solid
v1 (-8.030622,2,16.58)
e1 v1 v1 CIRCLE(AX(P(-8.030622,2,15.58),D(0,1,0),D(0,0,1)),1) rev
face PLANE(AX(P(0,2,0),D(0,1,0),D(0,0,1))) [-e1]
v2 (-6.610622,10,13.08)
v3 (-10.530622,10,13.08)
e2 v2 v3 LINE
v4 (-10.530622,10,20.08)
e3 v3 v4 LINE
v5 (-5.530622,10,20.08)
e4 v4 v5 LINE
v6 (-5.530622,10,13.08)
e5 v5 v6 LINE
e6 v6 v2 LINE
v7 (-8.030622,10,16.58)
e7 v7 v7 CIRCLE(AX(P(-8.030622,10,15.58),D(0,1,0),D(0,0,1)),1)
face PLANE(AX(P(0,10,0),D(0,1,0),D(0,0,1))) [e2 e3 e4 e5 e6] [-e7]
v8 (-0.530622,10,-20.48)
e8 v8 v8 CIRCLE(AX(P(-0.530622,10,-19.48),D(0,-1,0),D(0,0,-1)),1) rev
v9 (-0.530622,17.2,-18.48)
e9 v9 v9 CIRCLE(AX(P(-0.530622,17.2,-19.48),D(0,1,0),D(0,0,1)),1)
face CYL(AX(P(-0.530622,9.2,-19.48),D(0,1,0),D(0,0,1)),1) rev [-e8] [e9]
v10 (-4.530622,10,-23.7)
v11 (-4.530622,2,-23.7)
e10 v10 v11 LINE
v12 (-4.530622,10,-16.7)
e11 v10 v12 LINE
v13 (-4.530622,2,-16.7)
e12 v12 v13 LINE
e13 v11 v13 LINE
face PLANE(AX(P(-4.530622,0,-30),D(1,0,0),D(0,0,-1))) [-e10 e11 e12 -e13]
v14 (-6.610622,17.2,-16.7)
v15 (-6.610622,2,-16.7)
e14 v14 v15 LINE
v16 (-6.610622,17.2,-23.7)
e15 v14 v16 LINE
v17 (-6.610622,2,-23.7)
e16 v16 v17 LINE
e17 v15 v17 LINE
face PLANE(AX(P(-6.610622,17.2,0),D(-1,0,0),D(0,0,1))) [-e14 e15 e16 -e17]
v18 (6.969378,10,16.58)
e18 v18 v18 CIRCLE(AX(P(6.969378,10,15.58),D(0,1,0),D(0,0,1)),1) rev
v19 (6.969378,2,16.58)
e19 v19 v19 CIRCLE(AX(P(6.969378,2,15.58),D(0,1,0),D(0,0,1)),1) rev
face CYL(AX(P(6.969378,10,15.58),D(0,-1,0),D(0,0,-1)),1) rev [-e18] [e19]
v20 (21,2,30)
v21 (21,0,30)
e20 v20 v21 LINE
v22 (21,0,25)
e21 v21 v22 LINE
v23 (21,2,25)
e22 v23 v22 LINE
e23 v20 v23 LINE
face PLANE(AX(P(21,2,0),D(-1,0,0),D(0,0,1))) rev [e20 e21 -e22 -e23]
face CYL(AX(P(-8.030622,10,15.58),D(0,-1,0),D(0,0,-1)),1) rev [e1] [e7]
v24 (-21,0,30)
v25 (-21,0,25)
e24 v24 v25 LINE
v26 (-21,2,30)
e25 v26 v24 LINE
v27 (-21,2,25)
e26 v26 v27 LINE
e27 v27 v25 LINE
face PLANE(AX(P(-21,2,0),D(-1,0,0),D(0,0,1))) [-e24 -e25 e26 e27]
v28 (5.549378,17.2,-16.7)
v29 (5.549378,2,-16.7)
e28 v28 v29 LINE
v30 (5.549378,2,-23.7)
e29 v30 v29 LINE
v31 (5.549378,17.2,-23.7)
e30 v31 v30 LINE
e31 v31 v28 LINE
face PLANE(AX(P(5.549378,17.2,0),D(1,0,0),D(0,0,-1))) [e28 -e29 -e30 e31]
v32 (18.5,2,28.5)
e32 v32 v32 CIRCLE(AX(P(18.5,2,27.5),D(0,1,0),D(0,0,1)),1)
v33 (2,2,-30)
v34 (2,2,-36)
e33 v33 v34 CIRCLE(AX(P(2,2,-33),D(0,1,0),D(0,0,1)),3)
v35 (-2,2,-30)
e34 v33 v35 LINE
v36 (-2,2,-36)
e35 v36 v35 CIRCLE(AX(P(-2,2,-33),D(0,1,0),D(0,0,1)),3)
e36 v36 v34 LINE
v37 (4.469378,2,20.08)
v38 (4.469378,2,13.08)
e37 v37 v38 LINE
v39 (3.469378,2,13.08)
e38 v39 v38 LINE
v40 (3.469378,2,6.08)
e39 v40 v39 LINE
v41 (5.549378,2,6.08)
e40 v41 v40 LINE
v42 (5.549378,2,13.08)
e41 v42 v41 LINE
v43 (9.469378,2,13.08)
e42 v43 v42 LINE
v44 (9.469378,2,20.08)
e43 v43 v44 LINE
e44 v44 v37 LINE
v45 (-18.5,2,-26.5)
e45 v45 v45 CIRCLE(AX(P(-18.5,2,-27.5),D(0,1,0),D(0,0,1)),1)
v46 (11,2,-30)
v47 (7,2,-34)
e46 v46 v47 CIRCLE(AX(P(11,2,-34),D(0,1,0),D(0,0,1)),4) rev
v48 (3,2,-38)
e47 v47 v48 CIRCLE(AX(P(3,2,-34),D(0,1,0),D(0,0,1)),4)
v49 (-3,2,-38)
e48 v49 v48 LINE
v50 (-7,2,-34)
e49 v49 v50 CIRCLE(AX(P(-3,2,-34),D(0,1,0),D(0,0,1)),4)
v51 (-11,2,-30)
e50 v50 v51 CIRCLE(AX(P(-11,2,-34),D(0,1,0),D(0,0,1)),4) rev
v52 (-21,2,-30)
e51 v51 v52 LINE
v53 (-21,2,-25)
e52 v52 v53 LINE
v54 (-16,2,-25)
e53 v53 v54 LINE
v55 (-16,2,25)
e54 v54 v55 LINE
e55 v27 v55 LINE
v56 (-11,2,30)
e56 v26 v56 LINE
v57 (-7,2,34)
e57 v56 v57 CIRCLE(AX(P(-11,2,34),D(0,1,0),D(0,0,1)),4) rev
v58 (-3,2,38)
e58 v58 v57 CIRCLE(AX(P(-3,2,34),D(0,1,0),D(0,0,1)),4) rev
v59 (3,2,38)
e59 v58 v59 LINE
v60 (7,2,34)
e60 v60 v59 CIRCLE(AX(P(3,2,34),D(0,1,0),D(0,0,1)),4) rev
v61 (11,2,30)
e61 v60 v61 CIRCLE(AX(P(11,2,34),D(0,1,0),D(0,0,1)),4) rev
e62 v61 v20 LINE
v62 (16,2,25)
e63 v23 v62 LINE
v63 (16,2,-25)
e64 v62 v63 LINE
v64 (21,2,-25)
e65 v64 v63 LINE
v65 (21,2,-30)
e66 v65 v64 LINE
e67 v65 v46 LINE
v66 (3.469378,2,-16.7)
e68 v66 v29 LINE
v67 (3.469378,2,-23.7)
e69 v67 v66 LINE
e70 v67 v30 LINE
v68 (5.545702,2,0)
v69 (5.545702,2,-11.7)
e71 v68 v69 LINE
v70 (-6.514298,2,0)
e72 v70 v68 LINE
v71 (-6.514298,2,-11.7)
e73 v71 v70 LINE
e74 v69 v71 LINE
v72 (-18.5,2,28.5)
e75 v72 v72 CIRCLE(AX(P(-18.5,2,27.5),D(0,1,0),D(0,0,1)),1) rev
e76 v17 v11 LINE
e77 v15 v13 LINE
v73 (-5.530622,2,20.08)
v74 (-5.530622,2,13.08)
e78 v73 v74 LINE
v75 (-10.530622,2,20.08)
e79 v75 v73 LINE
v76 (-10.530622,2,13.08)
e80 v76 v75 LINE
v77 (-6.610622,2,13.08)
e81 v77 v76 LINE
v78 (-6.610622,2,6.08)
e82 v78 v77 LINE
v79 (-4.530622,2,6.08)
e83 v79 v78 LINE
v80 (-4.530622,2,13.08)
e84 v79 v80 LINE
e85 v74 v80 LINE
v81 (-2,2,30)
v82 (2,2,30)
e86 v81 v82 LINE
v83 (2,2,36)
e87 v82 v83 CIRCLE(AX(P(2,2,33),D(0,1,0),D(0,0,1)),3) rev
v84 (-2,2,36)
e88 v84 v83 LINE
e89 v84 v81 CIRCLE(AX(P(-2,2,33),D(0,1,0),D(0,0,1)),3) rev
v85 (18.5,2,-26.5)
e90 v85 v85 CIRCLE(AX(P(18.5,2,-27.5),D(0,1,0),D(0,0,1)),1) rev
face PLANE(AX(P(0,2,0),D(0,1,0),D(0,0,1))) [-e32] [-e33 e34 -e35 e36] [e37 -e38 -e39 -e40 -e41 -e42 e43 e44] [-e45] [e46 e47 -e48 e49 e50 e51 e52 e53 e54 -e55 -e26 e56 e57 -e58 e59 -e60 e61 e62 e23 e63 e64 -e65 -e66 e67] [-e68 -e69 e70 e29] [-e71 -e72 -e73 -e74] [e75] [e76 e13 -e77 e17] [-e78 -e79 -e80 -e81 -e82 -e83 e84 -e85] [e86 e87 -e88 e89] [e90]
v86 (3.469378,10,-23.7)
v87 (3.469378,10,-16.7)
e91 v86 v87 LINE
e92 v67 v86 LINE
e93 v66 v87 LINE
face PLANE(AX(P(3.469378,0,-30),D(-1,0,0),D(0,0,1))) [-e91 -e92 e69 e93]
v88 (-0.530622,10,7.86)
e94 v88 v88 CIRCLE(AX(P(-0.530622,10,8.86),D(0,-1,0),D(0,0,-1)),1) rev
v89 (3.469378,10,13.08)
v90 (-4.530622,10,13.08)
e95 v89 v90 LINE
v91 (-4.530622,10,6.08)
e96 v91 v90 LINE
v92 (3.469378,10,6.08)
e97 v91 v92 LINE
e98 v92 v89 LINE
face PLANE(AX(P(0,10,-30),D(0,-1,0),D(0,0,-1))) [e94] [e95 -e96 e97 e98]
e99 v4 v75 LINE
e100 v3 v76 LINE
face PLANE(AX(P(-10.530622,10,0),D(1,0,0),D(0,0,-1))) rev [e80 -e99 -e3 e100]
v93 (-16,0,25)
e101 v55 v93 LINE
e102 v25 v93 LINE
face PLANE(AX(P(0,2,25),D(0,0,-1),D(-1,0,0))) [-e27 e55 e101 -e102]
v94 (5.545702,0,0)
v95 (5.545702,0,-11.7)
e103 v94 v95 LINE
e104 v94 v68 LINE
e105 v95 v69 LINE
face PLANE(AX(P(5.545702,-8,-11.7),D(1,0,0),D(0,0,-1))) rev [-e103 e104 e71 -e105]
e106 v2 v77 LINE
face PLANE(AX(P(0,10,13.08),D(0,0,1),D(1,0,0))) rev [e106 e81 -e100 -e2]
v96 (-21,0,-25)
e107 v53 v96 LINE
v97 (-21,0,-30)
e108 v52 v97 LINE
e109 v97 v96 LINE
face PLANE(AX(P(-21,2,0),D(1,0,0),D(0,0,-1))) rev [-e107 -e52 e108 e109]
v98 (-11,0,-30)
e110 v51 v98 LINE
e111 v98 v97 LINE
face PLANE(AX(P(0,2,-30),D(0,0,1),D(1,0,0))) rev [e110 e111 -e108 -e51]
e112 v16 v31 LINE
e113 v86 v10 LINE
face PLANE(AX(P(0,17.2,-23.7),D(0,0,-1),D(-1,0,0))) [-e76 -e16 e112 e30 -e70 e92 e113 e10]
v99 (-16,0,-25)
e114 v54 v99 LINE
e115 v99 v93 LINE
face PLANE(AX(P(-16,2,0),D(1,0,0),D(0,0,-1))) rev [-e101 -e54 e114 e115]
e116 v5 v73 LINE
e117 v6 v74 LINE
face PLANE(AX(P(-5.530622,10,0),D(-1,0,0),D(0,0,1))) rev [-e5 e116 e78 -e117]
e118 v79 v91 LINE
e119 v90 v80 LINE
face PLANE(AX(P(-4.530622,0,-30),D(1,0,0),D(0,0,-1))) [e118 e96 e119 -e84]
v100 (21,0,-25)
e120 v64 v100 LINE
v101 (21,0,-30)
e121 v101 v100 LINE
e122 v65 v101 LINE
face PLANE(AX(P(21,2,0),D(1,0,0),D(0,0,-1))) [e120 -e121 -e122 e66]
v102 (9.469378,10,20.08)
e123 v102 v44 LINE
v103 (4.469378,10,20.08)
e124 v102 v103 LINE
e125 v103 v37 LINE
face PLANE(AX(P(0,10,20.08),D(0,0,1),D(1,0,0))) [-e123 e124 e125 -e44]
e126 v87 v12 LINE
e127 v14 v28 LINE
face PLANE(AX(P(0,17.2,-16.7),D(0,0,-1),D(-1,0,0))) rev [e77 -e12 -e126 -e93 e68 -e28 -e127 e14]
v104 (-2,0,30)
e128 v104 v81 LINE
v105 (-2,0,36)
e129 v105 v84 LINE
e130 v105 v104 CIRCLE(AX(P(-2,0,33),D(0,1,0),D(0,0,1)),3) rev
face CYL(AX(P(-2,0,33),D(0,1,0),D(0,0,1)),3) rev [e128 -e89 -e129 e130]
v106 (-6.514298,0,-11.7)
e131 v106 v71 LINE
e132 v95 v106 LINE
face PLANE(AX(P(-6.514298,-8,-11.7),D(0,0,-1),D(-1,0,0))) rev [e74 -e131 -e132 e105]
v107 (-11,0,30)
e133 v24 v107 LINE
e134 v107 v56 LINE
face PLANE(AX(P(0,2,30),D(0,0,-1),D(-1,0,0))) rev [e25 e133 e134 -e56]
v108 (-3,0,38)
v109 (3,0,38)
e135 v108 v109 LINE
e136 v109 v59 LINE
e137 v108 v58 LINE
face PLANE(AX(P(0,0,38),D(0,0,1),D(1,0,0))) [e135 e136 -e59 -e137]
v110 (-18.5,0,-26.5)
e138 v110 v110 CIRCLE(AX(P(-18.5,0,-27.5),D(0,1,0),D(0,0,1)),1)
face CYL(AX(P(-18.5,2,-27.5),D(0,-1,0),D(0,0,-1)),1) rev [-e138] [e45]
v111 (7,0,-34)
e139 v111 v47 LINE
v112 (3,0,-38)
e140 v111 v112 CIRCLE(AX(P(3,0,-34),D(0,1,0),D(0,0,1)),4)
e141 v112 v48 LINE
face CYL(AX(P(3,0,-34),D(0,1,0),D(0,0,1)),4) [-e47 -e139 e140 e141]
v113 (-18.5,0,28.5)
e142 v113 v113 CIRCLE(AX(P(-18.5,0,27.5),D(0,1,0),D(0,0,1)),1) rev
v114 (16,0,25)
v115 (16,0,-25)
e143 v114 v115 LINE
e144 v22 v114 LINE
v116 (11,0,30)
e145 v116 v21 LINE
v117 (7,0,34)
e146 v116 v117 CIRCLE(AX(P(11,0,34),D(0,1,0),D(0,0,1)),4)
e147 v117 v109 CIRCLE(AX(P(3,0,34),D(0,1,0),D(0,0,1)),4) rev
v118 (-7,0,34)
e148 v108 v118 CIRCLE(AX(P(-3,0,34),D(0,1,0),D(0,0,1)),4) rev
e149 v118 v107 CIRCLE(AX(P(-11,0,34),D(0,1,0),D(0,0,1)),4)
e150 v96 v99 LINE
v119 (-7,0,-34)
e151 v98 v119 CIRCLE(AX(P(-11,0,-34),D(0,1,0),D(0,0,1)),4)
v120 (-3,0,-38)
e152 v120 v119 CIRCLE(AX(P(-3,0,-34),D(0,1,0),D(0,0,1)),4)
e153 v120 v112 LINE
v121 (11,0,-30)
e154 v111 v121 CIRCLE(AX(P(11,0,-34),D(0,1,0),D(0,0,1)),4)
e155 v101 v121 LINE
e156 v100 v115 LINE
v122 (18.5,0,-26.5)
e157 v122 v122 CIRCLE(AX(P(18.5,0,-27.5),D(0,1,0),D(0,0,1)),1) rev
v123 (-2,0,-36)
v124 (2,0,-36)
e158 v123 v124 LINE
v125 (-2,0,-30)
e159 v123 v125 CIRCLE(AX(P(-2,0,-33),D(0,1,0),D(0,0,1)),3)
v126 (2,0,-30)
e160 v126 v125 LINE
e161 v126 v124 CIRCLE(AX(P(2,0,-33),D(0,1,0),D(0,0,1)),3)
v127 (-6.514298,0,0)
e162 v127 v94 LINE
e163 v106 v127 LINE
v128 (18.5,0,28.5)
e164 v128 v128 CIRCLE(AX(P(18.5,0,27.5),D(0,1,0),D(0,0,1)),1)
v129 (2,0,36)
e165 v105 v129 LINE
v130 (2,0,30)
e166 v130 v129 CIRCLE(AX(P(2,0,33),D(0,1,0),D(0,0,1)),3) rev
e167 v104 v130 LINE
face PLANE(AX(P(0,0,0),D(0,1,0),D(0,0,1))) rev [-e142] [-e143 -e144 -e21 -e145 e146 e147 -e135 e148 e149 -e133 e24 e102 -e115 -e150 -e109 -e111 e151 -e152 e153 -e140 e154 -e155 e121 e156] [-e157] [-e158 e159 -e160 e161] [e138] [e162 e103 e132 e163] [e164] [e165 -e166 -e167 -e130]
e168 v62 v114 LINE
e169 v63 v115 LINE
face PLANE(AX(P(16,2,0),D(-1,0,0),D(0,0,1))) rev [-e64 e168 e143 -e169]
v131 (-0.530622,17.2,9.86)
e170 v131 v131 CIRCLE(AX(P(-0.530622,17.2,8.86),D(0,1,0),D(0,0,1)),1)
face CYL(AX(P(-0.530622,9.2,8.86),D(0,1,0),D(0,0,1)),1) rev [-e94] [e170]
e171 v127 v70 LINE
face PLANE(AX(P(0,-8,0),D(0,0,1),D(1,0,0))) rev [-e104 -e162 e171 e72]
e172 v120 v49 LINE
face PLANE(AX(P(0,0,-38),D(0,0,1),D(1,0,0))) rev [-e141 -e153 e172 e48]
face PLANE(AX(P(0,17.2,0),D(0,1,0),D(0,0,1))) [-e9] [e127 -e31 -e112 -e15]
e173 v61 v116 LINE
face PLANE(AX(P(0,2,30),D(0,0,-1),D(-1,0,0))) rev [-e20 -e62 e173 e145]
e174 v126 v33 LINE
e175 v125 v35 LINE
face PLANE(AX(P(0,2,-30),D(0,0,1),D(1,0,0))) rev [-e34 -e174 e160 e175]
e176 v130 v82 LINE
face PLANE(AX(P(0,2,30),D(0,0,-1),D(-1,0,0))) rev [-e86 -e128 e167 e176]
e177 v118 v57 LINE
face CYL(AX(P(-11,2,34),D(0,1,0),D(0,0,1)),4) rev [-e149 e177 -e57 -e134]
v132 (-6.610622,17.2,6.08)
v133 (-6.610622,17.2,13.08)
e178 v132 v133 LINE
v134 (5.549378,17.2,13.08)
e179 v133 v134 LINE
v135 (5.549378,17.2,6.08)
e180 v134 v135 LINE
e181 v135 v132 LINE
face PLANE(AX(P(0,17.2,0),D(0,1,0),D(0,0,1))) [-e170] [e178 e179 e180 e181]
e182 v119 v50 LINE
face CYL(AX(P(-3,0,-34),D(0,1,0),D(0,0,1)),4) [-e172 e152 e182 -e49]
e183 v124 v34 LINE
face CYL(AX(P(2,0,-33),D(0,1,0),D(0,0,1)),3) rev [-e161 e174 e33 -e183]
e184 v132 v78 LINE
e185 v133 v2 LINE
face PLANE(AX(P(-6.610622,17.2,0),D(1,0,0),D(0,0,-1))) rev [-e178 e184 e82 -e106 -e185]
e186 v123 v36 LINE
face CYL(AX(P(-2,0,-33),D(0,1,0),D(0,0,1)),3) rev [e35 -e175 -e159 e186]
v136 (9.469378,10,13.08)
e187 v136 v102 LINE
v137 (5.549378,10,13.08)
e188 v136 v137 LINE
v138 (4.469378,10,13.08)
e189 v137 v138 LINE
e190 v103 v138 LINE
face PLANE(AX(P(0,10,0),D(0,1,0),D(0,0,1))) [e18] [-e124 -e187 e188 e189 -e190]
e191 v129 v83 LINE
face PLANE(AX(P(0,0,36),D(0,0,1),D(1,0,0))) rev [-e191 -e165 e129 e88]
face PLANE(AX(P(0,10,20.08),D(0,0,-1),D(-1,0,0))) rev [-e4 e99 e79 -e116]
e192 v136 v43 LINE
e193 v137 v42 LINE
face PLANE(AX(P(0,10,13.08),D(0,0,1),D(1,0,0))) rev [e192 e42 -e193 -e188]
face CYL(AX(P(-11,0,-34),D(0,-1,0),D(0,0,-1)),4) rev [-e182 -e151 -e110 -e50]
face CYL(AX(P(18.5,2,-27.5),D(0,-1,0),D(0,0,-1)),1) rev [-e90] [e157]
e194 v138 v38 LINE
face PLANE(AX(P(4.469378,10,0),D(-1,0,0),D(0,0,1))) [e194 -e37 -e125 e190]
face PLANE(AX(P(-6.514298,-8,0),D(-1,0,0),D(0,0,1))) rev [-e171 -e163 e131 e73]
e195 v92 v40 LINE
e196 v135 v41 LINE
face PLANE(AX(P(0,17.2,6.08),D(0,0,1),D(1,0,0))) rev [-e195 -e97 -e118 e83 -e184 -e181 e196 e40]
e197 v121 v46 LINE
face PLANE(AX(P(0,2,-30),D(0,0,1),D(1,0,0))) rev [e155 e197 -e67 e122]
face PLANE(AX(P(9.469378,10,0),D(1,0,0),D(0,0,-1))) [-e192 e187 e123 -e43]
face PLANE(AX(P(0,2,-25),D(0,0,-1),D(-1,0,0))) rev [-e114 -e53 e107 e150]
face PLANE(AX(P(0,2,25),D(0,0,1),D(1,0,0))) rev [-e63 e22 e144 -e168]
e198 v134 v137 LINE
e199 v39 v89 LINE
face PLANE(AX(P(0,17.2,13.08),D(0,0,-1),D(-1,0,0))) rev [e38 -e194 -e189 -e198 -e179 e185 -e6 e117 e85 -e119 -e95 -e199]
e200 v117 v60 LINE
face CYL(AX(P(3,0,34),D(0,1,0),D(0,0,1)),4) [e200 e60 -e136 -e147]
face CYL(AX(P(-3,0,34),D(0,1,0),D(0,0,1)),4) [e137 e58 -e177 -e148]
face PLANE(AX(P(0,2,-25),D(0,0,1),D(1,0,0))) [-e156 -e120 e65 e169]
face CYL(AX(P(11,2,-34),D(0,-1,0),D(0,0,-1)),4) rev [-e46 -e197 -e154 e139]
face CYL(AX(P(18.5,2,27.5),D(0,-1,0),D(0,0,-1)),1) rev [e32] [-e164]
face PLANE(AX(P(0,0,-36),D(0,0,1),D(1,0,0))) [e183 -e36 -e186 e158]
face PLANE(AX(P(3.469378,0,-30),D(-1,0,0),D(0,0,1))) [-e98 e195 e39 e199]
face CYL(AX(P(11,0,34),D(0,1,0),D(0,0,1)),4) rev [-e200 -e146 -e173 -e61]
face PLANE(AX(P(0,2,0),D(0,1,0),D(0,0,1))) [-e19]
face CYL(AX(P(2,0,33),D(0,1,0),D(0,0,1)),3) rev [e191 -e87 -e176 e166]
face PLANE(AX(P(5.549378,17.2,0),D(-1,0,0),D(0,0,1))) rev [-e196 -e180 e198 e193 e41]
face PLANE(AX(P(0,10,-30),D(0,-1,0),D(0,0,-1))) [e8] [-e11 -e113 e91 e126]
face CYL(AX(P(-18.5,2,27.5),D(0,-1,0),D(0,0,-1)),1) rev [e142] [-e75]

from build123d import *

# Parameters (mm, degrees)
CROQUIS1_R                 = 1
SALIENTE_EXTRUIR2_DEPTH    = 2
SALIENTE_EXTRUIR3_DEPTH    = 15.2
CROQUIS3_R                 = 1
CORTAR_EXTRUIR1_DEPTH      = 8
CROQUIS4_R                 = 1
SALIENTE_EXTRUIR4_DEPTH    = 8
CORTAR_EXTRUIR2_DEPTH      = 51.918821667
CORTAR_EXTRUIR2_DEPTH_BACK = 51.918821667
SALIENTE_EXTRUIR6_DEPTH    = 2
REDONDEO1_R                = 4
CORTAR_EXTRUIR3_DEPTH      = 10


with BuildPart() as part:
    # Croquis1 → Saliente-Extruir2 (new body)
    with BuildSketch(Plane(origin=(0, 0, 0), x_dir=(1, 0, 0), z_dir=(0, 1, 0))):
        Polygon((-21, 30), (-21, 25), (-16, 25), (-16, -25), (-21, -25), (-21, -30), (21, -30), (21, -25), (16, -25), (16, 25), (21, 25), (21, 30), align=None)
        with Locations(Location((-18.5, -27.5, 0), (0, 0, 270))):
            Circle(CROQUIS1_R, mode=Mode.SUBTRACT)
        with Locations(Location((-18.5, 27.5, 0), (0, 0, 270))):
            Circle(CROQUIS1_R, mode=Mode.SUBTRACT)
        with Locations(Location((18.5, 27.5, 0), (0, 0, 270))):
            Circle(CROQUIS1_R, mode=Mode.SUBTRACT)
        with Locations(Location((18.5, -27.5, 0), (0, 0, 270))):
            Circle(CROQUIS1_R, mode=Mode.SUBTRACT)
    extrude(amount=SALIENTE_EXTRUIR2_DEPTH)

    # Croquis2 → Saliente-Extruir3 (add)
    with BuildSketch(Plane(origin=(0, 2, 0), x_dir=(1, 0, 0), z_dir=(0, 1, 0))):
        Polygon((5.549377546, 23.7), (5.549377546, 16.7), (-0.530622454, 16.7), (-6.610622454, 16.7), (-6.610622454, 23.7), align=None)
        Polygon((-6.610622454, -13.08), (5.549377546, -13.08), (5.549377546, -6.08), (-0.530622454, -6.08), (-6.610622454, -6.08), align=None)
    extrude(amount=SALIENTE_EXTRUIR3_DEPTH)

    # Croquis3 → Cortar-Extruir1 (cut)
    with BuildSketch(Plane(origin=(0, 17.2, 0), x_dir=(1, 0, 0), z_dir=(0, 1, 0))):
        with Locations(Location((-0.530622454, 19.48, 0), (0, 0, 270))):
            Circle(CROQUIS3_R)
        with Locations(Location((-0.530622454, -8.86, 0), (0, 0, 270))):
            Circle(CROQUIS3_R)
    extrude(amount=-CORTAR_EXTRUIR1_DEPTH, mode=Mode.SUBTRACT)

    # Croquis4 → Saliente-Extruir4 (add)
    # profile 1 of 2: a face of its own
    with BuildSketch(Plane(origin=(0, 2, 0), x_dir=(1, 0, 0), z_dir=(0, 1, 0))):
        Polygon((-5.530622454, -20.08), (-5.530622454, -13.08), (-6.610622454, -13.08), (-10.530622454, -13.08), (-10.530622454, -20.08), align=None)
        with Locations(Location((-8.030622454, -15.58, 0), (0, 0, 270))):
            Circle(CROQUIS4_R, mode=Mode.SUBTRACT)
    # profile 2 of 2: a face of its own
    with BuildSketch(Plane(origin=(0, 2, 0), x_dir=(1, 0, 0), z_dir=(0, 1, 0))):
        Polygon((9.469377546, -20.08), (9.469377546, -13.08), (5.549377546, -13.08), (4.469377546, -13.08), (4.469377546, -20.08), align=None)
        with Locations(Location((6.969377546, -15.58, 0), (0, 0, 270))):
            Circle(CROQUIS4_R, mode=Mode.SUBTRACT)
    extrude(amount=SALIENTE_EXTRUIR4_DEPTH)

    # Croquis5 → Cortar-Extruir2 (cut, two sides: drawn at the far end of the back side and taken through both)
    with BuildSketch(Plane.XY.offset(13.08).offset(-CORTAR_EXTRUIR2_DEPTH_BACK)):
        Polygon((-4.530622454, 2), (-0.530622454, 2), (3.469377546, 2), (3.469377546, 10), (-4.530622454, 10), align=None)
    extrude(amount=CORTAR_EXTRUIR2_DEPTH + CORTAR_EXTRUIR2_DEPTH_BACK, mode=Mode.SUBTRACT)

    # Croquis6 → Saliente-Extruir6 (add)
    with BuildSketch(Plane(origin=(0, 2, 0), x_dir=(1, 0, 0), z_dir=(0, 1, 0))):
        with BuildLine():
            Line((3.5, 30), (5, 30))
            Line((5, 30), (7, 30))
            Line((7, 30), (7, 34))
            ThreePointArc((7, 34), (5.828427125, 36.828427125), (3, 38))
            Line((3, 38), (-3, 38))
            ThreePointArc((-3, 38), (-5.828427125, 36.828427125), (-7, 34))
            Line((-7, 34), (-7, 30))
            Line((-7, 30), (-5, 30))
            Line((-5, 30), (-3.5, 30))
            Line((-3.5, 30), (-2, 30))
            ThreePointArc((-2, 30), (-4.121320344, 30.878679656), (-5, 33))
            ThreePointArc((-5, 33), (-4.121320344, 35.121320344), (-2, 36))
            Line((-2, 36), (0, 36))
            Line((0, 36), (2, 36))
            ThreePointArc((2, 36), (4.121320344, 35.121320344), (5, 33))
            ThreePointArc((5, 33), (4.121320344, 30.878679656), (2, 30))
            Line((2, 30), (3.5, 30))
        make_face()
        with BuildLine():
            Line((7, -34), (7, -30))
            Line((7, -30), (5, -30))
            Line((5, -30), (3.5, -30))
            Line((3.5, -30), (2, -30))
            ThreePointArc((2, -30), (4.121320344, -30.878679656), (5, -33))
            ThreePointArc((5, -33), (4.121320344, -35.121320344), (2, -36))
            Line((2, -36), (0, -36))
            Line((0, -36), (-2, -36))
            ThreePointArc((-2, -36), (-4.121320344, -35.121320344), (-5, -33))
            ThreePointArc((-5, -33), (-4.121320344, -30.878679656), (-2, -30))
            Line((-2, -30), (-3.5, -30))
            Line((-3.5, -30), (-5, -30))
            Line((-5, -30), (-7, -30))
            Line((-7, -30), (-7, -34))
            ThreePointArc((-7, -34), (-5.828427125, -36.828427125), (-3, -38))
            Line((-3, -38), (3, -38))
            ThreePointArc((3, -38), (5.828427125, -36.828427125), (7, -34))
        make_face()
    extrude(amount=-SALIENTE_EXTRUIR6_DEPTH)

    # Redondeo1
    redondeo1_edges = [part.edges().sort_by_distance(p)[0] for p in [
        (7, 1, -30),
        (-7, 1, -30),
        (-7, 1, 30),
        (7, 1, 30),
    ]]
    fillet(redondeo1_edges, radius=REDONDEO1_R - 0.0001)  # a hair under: the kernel refuses the full size

    # Croquis7 → Cortar-Extruir3 (cut)
    with BuildSketch(Plane(origin=(0, 2, 0), x_dir=(1, 0, 0), z_dir=(0, 1, 0))):
        Polygon((0, 0), (-6.51429836, 0), (-6.51429836, 11.7), (0, 11.7), (5.54570164, 11.7), (5.54570164, 0), align=None)
    extrude(amount=-CORTAR_EXTRUIR3_DEPTH, mode=Mode.SUBTRACT)


solid = part.part
